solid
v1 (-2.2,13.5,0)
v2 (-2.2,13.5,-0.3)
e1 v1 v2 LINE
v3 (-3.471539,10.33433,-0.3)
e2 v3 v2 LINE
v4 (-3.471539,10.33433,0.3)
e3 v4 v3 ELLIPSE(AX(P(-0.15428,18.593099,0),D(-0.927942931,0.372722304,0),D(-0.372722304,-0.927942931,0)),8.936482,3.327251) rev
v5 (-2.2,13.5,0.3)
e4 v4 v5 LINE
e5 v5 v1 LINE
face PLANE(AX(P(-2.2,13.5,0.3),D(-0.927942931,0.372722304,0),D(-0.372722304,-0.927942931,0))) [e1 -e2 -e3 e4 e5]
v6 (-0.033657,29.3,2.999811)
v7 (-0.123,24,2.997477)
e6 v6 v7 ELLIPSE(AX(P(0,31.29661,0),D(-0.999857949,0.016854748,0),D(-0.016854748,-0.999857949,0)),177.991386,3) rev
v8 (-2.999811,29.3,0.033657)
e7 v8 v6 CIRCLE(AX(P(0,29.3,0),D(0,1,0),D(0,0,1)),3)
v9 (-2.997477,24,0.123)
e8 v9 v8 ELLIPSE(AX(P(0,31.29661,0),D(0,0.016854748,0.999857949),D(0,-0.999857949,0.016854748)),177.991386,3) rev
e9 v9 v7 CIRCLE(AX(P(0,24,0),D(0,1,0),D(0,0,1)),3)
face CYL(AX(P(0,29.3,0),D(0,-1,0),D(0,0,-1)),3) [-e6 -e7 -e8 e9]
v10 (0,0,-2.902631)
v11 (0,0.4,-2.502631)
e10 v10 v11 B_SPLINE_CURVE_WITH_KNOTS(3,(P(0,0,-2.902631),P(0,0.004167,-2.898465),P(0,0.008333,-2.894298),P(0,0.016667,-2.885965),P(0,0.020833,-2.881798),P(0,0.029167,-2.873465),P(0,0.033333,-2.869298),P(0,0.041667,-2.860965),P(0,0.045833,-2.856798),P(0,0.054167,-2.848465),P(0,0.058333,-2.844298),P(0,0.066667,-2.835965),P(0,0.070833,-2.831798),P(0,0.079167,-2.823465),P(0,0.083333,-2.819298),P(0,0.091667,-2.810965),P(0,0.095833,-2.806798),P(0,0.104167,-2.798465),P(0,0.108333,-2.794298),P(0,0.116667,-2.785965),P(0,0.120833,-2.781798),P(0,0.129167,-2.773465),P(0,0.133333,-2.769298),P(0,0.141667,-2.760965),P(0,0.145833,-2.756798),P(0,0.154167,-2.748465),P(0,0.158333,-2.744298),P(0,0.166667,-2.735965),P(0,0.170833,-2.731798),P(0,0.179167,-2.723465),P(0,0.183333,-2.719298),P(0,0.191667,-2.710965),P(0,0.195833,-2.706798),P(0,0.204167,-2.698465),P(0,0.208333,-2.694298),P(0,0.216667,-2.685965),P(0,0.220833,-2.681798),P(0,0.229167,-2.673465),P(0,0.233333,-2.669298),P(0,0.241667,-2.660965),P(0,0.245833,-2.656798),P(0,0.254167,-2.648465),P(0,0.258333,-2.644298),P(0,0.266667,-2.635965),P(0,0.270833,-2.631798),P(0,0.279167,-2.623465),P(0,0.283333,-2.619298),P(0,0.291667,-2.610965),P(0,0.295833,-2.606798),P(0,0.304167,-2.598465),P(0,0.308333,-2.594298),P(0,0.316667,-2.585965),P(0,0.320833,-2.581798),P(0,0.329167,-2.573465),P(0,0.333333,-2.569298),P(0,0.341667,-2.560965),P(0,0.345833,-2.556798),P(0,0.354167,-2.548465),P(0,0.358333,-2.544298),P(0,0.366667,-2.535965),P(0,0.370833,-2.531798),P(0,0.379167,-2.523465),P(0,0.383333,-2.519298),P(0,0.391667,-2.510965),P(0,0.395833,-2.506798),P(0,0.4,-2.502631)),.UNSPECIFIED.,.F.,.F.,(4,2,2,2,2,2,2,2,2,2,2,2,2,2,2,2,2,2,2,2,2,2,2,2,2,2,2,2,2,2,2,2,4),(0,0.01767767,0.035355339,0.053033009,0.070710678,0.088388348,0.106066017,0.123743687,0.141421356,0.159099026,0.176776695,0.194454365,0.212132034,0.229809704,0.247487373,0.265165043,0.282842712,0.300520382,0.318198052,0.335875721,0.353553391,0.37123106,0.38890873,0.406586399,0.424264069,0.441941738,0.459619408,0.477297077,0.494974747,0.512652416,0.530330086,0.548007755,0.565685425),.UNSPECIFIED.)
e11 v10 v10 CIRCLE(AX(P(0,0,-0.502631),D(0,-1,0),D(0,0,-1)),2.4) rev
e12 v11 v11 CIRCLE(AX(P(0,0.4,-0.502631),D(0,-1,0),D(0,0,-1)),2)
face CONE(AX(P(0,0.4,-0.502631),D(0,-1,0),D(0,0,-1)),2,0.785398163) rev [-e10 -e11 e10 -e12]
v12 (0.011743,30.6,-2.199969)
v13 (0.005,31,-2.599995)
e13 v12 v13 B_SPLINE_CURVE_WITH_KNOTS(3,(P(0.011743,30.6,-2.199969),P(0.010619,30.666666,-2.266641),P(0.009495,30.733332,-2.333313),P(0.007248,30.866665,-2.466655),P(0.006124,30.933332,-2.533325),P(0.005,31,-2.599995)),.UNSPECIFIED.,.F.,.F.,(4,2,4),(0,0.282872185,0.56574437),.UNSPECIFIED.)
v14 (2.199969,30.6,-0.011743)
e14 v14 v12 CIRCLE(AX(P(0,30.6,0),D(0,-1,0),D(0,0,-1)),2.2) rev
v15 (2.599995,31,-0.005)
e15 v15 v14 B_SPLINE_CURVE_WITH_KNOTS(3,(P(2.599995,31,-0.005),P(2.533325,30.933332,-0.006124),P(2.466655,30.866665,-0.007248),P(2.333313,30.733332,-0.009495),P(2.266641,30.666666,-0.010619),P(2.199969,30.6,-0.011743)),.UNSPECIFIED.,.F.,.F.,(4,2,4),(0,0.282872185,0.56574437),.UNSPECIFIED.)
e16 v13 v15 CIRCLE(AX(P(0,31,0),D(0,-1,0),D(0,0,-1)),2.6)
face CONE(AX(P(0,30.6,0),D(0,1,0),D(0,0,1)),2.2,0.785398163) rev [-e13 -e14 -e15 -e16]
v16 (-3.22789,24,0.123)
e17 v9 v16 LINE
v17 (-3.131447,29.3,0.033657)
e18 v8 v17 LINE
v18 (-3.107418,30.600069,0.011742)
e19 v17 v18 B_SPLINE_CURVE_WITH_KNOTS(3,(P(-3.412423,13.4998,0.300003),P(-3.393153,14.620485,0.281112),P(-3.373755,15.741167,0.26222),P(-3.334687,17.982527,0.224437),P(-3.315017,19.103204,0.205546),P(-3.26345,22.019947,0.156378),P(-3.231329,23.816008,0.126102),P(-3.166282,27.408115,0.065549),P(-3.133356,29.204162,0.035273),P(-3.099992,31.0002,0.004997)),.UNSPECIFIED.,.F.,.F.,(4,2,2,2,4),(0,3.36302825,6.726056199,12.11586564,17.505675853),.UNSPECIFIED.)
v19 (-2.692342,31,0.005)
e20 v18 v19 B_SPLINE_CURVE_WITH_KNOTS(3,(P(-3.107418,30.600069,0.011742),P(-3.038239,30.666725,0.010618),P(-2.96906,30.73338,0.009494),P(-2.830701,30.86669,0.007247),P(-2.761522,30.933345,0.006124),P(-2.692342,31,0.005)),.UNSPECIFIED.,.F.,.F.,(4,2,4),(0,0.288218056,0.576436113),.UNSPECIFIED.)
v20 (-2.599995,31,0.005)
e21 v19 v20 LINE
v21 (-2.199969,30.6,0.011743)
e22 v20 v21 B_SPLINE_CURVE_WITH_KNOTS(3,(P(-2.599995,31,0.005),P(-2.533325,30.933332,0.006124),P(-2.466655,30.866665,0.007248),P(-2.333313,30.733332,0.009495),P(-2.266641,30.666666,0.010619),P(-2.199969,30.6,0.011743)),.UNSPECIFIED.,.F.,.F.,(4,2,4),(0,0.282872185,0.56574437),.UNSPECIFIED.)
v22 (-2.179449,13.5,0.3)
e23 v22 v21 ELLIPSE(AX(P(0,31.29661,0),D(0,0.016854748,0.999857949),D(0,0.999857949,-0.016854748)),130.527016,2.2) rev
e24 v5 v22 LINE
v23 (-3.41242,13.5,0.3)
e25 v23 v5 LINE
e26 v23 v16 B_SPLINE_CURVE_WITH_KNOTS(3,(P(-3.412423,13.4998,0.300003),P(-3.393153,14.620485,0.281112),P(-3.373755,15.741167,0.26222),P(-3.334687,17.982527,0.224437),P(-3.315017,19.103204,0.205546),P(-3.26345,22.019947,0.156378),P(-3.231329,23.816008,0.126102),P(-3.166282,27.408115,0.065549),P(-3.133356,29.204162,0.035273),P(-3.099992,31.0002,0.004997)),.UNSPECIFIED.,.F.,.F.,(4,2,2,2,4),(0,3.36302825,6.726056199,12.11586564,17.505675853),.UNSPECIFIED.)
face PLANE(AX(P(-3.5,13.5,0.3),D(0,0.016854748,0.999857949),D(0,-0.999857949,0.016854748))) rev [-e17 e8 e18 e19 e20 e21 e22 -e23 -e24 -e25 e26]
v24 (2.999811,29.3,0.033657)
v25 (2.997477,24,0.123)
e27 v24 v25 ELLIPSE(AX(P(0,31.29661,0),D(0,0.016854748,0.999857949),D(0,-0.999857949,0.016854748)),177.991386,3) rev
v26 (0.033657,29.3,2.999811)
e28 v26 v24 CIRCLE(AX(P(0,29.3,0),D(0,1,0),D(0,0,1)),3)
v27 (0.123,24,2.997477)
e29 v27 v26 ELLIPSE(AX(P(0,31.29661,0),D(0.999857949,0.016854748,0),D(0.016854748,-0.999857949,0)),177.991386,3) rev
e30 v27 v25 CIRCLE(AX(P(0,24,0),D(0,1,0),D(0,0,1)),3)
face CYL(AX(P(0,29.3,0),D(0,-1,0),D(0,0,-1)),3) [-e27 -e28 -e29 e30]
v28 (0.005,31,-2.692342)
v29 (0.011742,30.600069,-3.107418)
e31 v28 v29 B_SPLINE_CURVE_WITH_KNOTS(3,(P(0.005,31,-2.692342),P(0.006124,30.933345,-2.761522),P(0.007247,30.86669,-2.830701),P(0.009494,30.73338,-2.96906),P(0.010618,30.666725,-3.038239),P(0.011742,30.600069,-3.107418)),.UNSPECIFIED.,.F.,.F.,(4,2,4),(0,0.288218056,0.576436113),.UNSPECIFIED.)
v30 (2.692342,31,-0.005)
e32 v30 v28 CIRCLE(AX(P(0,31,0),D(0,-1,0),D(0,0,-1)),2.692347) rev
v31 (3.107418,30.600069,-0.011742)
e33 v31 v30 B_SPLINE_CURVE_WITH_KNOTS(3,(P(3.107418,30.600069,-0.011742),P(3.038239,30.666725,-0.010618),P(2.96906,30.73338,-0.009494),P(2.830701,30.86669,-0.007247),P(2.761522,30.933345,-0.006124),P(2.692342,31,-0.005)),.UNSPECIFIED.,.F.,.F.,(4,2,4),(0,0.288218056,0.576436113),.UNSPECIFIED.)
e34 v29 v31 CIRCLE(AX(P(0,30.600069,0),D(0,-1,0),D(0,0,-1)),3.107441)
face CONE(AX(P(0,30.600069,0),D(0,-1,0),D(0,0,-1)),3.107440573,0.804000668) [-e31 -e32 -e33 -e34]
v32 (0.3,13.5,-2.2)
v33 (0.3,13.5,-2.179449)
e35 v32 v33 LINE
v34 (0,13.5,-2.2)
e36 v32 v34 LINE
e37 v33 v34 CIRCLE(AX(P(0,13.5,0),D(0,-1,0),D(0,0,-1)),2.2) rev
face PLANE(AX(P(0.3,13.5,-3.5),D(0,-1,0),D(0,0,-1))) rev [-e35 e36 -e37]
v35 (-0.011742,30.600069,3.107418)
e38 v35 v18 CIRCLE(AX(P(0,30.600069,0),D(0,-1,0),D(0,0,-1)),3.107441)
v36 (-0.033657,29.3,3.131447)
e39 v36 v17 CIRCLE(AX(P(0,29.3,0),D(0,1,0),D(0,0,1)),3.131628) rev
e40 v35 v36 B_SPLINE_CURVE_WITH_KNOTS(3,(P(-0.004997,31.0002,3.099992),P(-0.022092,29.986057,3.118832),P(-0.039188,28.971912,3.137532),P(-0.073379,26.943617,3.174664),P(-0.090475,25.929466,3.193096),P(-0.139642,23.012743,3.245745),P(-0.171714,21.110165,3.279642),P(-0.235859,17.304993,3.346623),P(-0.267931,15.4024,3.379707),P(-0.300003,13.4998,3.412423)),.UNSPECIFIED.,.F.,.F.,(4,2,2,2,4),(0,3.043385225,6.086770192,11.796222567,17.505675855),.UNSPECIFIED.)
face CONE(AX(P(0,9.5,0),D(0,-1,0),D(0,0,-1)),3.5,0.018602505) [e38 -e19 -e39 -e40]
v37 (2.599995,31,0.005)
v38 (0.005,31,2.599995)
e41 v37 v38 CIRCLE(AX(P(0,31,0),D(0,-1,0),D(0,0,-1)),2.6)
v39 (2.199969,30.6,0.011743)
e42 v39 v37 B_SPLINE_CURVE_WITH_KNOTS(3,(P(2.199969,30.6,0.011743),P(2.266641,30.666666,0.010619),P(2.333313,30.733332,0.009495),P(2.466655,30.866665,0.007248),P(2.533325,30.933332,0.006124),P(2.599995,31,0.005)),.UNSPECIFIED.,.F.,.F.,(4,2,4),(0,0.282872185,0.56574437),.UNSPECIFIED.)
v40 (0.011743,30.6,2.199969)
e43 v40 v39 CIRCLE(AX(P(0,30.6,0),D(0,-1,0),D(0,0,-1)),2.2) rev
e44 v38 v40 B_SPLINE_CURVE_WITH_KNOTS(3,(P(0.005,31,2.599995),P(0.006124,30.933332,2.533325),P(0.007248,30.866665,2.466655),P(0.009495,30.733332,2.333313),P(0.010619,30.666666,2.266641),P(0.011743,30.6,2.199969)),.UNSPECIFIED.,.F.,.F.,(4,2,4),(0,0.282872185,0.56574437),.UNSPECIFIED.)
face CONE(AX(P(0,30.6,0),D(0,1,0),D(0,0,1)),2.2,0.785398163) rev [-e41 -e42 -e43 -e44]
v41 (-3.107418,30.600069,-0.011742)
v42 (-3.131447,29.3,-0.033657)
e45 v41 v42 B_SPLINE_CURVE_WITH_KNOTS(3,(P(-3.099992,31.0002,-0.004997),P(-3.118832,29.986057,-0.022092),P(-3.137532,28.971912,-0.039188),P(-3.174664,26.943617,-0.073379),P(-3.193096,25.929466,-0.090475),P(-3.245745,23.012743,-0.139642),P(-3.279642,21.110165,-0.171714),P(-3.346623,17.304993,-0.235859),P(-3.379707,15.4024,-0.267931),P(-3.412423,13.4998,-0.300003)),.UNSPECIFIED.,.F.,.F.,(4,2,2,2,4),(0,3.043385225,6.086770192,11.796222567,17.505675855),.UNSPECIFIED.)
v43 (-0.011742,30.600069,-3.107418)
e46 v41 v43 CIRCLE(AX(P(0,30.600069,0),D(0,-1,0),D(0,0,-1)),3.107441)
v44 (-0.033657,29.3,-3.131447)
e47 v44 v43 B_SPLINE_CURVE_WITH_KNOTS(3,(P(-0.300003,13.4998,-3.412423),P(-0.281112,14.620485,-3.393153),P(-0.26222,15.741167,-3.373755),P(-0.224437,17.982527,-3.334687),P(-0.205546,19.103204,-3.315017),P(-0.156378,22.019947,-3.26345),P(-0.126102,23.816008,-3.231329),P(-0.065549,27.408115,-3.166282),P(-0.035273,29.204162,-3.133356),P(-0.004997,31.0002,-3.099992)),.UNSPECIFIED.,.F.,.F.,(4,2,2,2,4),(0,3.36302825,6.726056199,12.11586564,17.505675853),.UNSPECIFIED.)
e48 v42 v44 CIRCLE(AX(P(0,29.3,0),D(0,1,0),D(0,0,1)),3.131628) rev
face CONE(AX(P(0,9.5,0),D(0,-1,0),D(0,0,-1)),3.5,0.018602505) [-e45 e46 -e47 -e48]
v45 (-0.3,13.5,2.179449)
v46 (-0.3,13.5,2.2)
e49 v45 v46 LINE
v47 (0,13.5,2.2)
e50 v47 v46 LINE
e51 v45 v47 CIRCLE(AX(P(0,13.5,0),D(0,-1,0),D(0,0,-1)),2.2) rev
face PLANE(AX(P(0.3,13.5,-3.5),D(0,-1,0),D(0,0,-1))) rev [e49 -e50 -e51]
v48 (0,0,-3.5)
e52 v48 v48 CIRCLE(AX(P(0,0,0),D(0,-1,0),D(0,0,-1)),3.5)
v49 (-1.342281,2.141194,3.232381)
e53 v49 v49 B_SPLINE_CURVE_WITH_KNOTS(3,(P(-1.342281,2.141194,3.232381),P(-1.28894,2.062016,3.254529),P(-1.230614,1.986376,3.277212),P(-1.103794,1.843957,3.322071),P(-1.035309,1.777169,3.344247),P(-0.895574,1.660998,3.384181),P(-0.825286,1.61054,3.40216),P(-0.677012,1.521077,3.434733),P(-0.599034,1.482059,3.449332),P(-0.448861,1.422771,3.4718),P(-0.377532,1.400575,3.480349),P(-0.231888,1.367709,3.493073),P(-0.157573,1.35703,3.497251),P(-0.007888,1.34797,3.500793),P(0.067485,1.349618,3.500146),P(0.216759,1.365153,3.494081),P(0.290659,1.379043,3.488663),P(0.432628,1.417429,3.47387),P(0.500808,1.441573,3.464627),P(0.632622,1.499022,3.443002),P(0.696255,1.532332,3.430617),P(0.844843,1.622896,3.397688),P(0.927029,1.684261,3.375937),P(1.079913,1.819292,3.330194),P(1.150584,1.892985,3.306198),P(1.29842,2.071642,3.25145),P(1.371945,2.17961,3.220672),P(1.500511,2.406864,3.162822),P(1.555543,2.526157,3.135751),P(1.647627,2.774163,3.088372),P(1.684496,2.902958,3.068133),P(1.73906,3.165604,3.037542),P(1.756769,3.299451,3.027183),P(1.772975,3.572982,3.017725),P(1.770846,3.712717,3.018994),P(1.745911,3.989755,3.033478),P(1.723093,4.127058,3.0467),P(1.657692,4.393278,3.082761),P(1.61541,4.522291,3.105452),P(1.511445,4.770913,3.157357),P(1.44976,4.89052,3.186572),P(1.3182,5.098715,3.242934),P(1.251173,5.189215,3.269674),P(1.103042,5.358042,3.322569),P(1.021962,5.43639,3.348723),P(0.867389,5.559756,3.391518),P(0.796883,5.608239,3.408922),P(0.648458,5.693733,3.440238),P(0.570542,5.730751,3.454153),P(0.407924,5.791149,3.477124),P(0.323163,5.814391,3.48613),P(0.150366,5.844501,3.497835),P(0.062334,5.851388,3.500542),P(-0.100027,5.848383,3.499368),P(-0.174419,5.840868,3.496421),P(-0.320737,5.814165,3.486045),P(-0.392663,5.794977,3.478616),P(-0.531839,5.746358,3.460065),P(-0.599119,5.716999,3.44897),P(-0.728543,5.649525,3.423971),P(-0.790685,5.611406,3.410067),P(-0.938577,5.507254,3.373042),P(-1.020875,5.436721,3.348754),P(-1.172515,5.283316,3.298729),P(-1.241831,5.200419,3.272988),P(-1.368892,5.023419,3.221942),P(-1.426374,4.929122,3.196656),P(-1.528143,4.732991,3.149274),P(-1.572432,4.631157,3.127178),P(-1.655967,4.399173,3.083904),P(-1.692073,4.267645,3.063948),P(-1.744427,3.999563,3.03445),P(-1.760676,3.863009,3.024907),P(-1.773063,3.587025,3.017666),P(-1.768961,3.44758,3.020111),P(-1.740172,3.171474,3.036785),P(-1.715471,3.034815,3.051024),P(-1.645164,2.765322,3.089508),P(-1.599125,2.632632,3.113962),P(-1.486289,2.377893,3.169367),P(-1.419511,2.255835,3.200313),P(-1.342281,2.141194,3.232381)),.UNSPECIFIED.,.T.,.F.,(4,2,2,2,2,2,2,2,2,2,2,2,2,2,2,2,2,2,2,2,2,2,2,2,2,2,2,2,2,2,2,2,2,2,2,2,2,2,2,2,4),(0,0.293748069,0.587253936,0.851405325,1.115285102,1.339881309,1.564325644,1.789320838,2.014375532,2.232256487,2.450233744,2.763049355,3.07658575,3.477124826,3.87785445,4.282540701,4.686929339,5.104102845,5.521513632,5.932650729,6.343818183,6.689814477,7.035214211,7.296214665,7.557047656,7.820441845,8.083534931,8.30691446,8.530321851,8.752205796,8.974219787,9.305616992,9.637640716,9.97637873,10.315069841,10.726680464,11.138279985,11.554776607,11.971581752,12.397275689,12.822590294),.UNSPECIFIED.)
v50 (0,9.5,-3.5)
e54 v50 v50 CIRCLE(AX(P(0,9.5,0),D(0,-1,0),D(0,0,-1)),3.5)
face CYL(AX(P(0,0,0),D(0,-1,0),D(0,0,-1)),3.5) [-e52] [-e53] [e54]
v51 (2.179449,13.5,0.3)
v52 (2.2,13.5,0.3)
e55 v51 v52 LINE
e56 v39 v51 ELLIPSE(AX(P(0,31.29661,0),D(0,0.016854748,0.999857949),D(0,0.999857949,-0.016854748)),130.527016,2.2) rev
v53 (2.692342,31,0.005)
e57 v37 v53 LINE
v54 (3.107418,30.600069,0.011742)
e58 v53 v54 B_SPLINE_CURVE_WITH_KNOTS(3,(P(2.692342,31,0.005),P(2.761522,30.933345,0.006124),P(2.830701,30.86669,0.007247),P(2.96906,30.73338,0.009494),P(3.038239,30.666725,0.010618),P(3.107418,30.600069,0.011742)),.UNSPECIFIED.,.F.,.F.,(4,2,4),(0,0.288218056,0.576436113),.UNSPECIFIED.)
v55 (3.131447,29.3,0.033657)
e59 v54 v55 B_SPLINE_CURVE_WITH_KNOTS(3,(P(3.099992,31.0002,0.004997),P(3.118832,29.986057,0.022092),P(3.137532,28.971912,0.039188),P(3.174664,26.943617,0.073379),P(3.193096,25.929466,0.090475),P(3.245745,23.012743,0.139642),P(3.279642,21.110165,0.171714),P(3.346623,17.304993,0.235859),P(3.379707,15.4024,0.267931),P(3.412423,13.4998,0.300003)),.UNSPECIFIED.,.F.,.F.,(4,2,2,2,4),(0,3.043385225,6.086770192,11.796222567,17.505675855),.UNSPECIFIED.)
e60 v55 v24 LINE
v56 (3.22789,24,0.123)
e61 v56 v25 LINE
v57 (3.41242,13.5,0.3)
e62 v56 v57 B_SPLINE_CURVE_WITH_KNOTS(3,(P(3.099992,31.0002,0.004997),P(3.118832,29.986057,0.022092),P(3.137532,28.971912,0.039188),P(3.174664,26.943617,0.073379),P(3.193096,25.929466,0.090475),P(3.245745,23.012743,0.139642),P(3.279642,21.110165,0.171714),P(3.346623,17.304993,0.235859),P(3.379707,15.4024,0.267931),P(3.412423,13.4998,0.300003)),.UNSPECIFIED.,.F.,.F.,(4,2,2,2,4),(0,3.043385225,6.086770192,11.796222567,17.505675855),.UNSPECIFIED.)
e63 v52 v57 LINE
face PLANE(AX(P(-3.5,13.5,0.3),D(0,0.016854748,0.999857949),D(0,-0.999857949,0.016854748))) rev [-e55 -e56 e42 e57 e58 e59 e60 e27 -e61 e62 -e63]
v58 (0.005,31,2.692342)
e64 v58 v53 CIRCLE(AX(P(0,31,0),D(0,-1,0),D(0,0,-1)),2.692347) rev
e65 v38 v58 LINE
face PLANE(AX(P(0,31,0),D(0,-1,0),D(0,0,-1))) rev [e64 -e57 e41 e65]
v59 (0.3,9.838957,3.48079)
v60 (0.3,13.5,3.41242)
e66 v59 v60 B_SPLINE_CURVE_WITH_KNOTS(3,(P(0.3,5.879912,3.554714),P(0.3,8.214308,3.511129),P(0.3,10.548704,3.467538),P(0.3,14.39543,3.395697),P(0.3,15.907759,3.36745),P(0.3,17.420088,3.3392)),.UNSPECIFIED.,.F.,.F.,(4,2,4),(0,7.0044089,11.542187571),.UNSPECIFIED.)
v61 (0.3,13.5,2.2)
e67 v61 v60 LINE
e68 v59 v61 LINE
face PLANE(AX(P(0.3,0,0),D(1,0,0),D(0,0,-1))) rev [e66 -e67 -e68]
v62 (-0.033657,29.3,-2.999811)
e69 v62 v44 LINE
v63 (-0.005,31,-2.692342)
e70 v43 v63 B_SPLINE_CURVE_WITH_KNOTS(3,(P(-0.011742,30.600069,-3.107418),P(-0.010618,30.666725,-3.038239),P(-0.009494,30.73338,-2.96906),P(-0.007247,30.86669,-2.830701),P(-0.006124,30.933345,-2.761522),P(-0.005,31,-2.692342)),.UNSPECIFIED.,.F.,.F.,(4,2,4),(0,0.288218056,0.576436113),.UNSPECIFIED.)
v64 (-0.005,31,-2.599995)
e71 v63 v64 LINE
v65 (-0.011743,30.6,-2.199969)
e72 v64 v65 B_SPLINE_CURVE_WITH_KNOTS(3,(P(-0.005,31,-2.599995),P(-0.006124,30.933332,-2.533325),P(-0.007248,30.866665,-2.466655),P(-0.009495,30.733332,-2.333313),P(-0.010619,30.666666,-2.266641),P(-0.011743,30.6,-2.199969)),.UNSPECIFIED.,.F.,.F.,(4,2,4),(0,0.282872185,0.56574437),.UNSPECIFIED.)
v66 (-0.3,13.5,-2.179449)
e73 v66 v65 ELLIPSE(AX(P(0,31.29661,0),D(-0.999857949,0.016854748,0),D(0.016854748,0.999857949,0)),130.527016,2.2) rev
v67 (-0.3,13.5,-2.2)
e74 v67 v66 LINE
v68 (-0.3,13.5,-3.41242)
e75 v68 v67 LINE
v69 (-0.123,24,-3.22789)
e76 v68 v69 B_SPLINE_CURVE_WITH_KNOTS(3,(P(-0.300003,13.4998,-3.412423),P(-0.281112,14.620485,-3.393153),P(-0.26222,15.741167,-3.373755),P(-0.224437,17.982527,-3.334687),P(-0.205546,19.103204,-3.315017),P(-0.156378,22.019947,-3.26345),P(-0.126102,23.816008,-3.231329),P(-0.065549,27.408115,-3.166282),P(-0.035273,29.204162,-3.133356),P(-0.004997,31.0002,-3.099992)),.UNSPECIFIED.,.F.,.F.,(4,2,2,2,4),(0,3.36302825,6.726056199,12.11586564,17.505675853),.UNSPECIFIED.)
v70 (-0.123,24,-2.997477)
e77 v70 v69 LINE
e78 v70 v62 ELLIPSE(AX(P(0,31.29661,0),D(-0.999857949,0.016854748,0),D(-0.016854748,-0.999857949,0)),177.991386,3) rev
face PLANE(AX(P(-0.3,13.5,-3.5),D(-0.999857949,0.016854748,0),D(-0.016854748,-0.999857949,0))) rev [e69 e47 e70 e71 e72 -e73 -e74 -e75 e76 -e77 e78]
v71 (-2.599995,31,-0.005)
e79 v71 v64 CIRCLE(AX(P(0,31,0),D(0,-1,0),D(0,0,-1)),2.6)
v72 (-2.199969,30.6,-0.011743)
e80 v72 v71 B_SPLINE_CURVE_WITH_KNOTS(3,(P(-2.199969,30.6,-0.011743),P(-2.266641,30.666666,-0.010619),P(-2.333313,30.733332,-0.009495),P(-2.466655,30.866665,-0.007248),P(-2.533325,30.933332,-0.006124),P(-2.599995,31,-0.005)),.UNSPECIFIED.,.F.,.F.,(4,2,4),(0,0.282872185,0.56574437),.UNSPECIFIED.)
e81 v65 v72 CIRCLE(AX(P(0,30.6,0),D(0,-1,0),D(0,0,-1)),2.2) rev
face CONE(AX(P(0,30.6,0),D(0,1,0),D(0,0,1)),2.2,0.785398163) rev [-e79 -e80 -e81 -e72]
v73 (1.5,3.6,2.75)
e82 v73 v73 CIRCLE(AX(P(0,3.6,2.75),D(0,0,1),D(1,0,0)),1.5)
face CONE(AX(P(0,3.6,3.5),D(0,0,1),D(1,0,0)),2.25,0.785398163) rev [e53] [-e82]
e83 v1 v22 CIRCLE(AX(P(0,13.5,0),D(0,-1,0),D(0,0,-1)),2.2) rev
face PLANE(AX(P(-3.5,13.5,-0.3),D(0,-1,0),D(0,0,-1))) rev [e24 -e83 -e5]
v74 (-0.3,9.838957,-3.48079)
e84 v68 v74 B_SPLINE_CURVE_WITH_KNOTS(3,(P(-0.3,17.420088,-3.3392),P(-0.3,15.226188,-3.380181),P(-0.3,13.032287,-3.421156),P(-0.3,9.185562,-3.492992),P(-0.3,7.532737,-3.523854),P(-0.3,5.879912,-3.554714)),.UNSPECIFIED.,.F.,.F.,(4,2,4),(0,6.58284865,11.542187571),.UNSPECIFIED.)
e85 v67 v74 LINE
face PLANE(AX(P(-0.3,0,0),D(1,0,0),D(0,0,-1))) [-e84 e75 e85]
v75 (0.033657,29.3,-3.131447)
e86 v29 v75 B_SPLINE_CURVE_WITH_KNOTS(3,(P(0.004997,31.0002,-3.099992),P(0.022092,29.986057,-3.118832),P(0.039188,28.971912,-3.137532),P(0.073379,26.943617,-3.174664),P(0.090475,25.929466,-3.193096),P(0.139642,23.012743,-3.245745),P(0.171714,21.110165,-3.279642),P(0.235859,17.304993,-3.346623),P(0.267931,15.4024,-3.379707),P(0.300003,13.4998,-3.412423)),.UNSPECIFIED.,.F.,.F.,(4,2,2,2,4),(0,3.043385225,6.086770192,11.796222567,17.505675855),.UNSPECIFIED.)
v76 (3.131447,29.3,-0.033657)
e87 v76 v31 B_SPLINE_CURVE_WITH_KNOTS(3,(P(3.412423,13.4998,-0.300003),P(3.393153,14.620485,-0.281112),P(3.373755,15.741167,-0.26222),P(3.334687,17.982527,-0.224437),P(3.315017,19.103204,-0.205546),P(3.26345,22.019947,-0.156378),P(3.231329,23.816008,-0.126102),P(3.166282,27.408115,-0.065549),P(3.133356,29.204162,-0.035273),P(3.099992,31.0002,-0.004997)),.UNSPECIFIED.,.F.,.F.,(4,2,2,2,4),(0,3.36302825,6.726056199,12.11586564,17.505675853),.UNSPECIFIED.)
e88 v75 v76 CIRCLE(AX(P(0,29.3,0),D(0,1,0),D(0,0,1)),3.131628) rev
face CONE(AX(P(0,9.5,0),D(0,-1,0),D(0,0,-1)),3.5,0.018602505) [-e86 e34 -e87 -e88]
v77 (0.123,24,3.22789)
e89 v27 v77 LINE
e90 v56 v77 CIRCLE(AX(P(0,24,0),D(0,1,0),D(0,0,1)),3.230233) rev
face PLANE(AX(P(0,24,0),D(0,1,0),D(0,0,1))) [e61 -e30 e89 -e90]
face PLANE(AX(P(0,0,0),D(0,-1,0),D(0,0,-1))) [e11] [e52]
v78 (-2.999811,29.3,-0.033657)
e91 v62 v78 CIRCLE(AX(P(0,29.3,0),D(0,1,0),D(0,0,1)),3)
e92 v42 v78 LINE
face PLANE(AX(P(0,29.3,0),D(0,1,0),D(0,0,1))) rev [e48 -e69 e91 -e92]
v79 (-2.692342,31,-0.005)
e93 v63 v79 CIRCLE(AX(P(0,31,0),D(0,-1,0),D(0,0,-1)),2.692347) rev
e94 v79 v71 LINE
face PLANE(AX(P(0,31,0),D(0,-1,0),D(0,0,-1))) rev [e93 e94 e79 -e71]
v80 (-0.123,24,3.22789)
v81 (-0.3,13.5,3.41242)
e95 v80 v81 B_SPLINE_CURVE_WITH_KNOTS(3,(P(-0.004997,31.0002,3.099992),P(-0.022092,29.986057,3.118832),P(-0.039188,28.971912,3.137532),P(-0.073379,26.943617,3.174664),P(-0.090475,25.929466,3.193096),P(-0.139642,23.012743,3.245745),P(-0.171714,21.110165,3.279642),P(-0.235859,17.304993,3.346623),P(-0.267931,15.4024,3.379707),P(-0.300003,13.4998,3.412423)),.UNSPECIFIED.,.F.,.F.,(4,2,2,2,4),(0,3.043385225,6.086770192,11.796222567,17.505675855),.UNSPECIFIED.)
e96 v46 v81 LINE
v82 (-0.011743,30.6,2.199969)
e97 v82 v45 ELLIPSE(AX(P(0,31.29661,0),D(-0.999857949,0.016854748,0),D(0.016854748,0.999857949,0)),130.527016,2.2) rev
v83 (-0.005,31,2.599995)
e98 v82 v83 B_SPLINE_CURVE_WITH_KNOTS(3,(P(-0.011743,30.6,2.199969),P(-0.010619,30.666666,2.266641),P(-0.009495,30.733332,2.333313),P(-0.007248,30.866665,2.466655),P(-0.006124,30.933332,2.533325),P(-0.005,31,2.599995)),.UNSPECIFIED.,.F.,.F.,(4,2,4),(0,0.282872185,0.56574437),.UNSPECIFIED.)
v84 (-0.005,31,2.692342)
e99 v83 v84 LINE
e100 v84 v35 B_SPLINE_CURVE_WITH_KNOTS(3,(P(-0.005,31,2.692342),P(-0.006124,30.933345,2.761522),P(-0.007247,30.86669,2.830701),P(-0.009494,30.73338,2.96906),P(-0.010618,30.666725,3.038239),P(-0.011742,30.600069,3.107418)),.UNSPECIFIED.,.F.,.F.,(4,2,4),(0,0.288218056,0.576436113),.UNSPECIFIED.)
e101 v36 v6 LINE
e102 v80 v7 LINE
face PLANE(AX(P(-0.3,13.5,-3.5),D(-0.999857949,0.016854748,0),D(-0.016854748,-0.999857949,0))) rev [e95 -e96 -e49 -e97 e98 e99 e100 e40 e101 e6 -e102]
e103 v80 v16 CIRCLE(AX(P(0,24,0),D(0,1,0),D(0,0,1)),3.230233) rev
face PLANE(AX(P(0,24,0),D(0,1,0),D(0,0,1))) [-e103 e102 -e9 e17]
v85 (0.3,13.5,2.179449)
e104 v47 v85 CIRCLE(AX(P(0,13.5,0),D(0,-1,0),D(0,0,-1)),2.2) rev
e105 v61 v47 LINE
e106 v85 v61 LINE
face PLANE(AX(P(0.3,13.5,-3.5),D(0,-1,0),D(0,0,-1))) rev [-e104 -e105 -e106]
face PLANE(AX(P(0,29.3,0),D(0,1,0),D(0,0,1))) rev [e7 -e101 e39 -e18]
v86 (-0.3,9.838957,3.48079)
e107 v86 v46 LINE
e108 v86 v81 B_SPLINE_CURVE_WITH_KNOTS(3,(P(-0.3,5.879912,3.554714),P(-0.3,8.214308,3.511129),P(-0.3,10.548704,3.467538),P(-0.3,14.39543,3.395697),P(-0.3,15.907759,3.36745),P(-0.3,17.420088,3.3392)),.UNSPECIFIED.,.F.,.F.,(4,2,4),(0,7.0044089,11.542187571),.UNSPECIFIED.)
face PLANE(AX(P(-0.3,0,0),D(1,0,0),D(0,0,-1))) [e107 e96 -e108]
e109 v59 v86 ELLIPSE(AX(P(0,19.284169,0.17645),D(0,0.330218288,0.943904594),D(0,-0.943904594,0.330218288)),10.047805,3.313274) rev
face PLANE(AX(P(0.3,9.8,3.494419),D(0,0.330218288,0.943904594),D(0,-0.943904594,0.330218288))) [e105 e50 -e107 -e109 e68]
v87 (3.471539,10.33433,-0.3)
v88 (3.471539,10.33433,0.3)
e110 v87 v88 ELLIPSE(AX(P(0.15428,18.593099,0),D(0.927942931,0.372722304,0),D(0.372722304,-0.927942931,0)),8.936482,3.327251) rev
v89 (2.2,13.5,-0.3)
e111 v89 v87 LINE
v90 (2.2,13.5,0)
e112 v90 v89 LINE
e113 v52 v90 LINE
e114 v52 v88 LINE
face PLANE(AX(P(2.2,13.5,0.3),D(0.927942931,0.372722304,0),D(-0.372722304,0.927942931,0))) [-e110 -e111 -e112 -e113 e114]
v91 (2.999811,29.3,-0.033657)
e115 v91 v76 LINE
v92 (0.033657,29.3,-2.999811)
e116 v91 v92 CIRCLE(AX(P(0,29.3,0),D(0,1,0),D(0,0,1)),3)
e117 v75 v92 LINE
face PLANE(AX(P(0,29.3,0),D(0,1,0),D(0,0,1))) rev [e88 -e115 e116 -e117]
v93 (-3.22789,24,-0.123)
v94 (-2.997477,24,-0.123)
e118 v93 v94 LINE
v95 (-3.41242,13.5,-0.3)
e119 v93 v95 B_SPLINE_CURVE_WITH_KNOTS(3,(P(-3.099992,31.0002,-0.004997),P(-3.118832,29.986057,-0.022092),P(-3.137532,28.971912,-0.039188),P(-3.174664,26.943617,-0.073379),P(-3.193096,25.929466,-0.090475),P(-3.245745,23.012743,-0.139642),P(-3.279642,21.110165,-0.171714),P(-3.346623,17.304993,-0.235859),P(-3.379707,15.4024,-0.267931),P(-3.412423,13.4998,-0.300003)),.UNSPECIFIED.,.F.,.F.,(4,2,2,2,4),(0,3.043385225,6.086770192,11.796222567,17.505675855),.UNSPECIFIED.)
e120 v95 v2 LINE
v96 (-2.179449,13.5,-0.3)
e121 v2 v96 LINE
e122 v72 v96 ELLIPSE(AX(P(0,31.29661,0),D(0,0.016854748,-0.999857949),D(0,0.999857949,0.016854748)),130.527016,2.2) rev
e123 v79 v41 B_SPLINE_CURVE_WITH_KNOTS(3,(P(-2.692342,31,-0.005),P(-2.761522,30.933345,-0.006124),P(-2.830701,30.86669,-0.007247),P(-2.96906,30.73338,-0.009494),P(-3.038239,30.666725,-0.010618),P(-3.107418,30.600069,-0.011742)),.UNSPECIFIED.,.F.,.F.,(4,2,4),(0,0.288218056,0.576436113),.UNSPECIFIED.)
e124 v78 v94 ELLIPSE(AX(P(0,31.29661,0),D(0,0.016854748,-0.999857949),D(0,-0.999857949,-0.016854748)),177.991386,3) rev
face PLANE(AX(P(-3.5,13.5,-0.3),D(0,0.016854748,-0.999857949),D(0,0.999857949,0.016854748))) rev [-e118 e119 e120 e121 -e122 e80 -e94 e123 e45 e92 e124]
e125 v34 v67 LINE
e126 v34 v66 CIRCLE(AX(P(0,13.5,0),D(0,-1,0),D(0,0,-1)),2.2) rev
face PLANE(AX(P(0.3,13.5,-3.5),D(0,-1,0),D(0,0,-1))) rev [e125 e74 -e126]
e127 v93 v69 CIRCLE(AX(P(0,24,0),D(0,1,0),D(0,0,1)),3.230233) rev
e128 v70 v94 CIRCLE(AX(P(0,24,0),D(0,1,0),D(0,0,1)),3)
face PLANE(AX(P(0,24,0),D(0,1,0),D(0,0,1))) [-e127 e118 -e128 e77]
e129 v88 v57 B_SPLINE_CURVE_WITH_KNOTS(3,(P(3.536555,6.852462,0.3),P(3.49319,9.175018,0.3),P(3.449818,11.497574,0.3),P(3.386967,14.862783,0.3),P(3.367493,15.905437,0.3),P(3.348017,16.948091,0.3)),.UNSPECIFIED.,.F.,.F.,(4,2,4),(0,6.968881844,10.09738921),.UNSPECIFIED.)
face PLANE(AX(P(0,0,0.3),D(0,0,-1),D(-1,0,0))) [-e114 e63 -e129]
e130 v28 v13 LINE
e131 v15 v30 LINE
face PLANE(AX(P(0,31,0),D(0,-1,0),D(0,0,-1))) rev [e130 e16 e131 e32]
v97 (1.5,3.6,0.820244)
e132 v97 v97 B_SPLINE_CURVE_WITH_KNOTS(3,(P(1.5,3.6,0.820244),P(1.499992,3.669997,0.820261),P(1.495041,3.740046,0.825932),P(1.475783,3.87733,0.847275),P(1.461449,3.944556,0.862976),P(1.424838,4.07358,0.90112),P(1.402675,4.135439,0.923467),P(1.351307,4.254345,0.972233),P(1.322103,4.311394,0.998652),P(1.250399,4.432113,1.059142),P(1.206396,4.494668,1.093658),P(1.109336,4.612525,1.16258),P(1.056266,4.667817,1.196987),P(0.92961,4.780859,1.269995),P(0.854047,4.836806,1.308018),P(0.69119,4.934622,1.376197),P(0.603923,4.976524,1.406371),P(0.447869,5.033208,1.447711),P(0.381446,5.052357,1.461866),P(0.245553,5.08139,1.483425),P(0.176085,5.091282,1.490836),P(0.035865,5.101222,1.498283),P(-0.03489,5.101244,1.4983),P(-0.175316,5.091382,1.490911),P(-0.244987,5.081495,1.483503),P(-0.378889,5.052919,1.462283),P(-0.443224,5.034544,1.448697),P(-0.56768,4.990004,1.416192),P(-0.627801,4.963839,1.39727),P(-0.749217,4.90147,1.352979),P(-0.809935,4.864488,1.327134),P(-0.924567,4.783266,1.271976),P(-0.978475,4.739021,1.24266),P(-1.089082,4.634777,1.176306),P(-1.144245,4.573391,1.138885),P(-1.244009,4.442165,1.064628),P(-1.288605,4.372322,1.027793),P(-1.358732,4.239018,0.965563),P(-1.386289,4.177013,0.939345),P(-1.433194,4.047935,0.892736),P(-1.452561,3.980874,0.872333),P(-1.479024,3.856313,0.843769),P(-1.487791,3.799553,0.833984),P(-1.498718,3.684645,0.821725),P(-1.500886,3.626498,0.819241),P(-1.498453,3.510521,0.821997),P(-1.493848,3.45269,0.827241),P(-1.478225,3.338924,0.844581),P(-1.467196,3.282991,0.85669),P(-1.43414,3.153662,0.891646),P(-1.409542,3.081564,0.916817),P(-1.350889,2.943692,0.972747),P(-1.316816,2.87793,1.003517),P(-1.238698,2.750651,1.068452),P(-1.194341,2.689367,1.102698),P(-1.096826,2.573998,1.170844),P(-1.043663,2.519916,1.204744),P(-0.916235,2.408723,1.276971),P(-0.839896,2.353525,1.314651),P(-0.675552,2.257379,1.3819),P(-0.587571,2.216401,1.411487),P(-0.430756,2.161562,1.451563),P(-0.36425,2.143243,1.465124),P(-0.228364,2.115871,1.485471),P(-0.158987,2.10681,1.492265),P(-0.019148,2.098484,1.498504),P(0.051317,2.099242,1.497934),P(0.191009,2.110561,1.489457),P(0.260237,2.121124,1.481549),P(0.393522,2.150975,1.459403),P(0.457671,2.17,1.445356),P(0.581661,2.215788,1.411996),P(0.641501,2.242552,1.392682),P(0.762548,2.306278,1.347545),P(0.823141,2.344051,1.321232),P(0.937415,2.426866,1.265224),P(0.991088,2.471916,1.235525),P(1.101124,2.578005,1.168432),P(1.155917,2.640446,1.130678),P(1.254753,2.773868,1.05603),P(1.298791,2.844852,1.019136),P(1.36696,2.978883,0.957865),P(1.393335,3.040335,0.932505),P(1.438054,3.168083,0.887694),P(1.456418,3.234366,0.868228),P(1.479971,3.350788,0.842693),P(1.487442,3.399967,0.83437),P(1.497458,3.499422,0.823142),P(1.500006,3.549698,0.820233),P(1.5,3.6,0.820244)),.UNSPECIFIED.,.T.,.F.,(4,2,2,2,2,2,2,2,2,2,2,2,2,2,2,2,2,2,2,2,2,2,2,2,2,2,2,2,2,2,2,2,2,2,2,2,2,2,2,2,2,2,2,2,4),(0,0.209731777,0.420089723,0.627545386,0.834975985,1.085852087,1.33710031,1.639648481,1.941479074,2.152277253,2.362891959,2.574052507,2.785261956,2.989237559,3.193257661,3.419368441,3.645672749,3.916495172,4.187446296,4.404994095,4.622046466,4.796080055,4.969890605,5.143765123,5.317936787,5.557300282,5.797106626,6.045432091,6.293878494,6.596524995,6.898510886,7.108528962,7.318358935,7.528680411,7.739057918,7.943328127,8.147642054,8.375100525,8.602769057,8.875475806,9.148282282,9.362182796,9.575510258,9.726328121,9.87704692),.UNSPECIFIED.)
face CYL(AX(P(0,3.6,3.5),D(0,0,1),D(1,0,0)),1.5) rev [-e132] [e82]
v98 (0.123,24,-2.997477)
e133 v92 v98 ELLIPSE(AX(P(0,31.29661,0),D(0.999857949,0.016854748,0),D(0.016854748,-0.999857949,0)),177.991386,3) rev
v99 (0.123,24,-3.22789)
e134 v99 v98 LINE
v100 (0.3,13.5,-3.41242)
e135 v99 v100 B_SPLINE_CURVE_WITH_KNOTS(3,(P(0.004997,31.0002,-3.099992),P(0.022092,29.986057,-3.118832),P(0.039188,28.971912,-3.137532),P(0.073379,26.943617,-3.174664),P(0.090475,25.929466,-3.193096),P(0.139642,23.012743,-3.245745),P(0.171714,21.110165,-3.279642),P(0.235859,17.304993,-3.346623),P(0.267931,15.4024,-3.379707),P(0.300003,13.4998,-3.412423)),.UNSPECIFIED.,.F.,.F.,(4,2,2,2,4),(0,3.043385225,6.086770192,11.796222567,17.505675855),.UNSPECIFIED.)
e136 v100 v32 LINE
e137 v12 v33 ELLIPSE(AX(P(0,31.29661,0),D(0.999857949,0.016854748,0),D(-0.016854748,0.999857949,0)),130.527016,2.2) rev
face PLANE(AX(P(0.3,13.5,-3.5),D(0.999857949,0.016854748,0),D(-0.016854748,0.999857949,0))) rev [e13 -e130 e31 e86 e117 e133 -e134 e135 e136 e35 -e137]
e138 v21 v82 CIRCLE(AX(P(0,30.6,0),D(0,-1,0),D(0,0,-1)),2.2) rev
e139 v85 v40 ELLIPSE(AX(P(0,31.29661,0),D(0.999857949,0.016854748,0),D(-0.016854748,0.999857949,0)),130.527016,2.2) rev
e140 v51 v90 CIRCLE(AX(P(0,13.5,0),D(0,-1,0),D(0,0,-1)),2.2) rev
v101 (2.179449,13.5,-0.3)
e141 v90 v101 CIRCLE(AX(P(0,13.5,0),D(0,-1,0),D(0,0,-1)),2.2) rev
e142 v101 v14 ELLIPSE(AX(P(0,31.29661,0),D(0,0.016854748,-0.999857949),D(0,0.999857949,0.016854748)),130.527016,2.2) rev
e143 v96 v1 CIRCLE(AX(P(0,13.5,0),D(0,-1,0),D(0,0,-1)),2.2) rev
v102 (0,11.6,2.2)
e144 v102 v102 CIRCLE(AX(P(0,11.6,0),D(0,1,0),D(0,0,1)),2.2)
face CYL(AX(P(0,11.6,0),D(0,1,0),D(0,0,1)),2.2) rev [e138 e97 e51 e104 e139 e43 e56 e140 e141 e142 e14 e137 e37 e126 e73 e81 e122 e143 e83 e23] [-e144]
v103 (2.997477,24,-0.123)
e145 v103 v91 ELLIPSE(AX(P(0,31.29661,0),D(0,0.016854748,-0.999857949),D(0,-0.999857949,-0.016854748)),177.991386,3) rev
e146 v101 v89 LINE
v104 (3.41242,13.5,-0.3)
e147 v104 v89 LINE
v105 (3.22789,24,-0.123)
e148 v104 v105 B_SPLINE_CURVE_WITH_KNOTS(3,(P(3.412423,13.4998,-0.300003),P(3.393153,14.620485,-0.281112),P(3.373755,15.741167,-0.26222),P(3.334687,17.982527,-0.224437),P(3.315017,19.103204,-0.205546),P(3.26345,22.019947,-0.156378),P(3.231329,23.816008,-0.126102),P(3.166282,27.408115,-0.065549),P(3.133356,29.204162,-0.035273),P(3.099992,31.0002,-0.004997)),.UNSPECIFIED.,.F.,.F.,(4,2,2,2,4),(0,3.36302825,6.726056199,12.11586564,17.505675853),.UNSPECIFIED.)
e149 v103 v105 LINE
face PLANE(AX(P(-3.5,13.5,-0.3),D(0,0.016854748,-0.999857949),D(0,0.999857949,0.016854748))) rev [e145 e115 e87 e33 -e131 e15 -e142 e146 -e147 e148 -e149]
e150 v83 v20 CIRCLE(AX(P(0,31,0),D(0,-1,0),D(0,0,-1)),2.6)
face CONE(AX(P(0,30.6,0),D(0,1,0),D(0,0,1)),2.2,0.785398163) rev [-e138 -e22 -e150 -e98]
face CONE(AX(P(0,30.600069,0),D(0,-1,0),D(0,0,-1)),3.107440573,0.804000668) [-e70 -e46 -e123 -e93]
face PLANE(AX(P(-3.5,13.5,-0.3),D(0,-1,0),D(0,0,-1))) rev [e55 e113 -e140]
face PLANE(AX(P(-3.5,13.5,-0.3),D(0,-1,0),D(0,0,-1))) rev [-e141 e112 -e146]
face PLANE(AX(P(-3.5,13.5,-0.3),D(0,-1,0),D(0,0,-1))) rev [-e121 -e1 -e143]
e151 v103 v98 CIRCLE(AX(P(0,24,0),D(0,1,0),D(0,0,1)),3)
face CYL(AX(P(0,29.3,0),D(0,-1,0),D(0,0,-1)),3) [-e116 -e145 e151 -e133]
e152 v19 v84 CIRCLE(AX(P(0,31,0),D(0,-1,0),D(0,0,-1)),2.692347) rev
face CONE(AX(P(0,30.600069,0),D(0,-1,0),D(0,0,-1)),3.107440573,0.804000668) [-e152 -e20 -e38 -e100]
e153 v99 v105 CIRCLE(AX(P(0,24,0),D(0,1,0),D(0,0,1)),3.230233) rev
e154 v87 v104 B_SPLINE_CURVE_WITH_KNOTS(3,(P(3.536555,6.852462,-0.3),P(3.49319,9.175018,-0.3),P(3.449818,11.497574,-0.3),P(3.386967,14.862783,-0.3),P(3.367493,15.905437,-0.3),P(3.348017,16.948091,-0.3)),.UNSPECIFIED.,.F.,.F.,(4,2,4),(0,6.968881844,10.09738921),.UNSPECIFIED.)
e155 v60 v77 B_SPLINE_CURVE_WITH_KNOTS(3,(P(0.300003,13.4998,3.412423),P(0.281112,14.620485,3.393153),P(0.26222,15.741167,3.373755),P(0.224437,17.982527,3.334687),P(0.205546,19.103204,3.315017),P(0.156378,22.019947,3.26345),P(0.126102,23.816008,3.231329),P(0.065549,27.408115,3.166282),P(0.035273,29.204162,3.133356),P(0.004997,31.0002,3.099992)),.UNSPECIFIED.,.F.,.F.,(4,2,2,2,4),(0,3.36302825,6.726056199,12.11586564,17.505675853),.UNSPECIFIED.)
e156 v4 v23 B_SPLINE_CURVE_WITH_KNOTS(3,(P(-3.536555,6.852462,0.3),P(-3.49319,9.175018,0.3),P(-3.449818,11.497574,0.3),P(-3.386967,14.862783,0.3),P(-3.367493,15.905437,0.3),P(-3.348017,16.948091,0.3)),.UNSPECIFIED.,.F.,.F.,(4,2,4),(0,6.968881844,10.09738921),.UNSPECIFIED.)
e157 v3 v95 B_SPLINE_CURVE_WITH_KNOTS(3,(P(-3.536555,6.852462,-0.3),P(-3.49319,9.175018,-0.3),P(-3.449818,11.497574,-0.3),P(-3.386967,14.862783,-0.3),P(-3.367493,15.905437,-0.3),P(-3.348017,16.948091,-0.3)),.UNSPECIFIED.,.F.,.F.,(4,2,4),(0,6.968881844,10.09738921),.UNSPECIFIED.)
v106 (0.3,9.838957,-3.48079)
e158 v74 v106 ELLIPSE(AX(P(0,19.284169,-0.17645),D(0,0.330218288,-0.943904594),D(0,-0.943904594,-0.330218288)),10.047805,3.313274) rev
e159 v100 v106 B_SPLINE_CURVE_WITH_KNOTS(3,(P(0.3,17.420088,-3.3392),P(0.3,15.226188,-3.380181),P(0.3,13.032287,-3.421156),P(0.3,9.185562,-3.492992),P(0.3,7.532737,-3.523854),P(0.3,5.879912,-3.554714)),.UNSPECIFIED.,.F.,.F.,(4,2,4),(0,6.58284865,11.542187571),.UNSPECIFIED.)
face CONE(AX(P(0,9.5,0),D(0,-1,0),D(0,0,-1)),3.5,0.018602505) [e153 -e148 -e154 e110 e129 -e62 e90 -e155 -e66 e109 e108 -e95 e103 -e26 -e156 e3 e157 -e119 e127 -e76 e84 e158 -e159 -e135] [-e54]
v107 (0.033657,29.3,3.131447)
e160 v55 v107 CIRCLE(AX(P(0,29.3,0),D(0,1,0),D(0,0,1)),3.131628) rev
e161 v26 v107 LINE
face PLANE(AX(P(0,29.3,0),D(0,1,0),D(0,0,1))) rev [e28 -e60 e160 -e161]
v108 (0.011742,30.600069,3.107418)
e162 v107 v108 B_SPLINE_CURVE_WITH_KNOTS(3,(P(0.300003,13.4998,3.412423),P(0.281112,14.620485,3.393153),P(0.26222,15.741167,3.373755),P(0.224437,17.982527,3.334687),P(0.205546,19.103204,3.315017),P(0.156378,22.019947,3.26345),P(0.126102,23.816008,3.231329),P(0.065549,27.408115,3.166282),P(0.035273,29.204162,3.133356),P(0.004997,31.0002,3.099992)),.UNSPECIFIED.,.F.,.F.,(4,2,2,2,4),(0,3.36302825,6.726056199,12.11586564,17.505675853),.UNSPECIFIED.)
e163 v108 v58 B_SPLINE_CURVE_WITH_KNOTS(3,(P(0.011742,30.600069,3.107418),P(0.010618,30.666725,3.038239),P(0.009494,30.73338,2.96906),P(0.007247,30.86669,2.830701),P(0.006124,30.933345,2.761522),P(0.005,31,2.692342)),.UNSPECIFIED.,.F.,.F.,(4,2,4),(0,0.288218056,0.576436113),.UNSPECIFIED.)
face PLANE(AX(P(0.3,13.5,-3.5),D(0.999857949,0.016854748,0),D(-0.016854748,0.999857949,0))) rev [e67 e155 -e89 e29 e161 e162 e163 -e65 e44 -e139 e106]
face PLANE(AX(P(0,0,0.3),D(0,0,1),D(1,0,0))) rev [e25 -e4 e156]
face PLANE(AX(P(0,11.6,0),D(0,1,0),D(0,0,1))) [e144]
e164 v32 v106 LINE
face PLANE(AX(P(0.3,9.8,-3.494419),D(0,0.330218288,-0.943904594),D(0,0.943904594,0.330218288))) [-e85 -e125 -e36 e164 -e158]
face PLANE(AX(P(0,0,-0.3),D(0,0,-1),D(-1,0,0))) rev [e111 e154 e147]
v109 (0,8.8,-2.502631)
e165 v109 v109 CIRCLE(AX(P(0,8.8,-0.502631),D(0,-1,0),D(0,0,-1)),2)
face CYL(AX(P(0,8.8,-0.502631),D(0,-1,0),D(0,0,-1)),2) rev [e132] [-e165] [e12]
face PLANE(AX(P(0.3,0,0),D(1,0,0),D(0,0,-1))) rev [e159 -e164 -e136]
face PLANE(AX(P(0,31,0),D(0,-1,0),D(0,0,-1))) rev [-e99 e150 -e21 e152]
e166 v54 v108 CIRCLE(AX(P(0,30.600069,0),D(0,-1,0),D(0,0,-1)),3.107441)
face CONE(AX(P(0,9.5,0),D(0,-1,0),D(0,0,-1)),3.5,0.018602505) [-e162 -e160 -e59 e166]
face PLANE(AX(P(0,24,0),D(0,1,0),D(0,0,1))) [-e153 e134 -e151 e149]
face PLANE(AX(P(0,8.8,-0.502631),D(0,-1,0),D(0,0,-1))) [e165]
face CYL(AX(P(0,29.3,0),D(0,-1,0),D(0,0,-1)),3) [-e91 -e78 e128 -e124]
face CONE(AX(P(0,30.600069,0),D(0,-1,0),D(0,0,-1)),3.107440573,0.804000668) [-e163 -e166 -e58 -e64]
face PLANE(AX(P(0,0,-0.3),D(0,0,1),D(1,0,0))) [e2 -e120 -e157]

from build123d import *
from OCP.BRepFilletAPI import BRepFilletAPI_MakeChamfer

# Parameters (mm, degrees)
SKETCH1_W               = 3.5
SKETCH1_H               = 9.5
SKETCH2_R               = 2.2
CUT_EXTRUDE1_DEPTH      = 19.4
SKETCH3_R               = 2
CUT_EXTRUDE2_DEPTH      = 8.8
CUT_EXTRUDE3_DEPTH      = 32.972644557
CUT_EXTRUDE4_DEPTH      = 32.972644557
CUT_EXTRUDE5_DEPTH      = 0.3
CUT_EXTRUDE5_DEPTH_BACK = 0.3
CUT_EXTRUDE6_DEPTH      = 0.3
CUT_EXTRUDE6_DEPTH_BACK = 0.3
CUT_EXTRUDE7_START      = 5.3
SKETCH15_R              = 3.5
SKETCH15_R_2            = 3
CUT_EXTRUDE7_DEPTH      = 5.3
CHAMFER1_SIZE           = 0.4
CHAMFER1_SIZE2          = 0.407653471


# Read off the part's stored shape, not the designer's step: CSK for M3 Oval Head Machine Screw1
with BuildPart() as part:
    # Sketch1 → Revolve1 (revolve)
    with BuildSketch(Plane.XY, mode=Mode.PRIVATE) as revolve1_sk:
        Polygon((0, 9.5), (3.5, 9.5), (3.1, 31), (0, 31), align=None)
        with Locations((1.75, 4.75)):
            Rectangle(SKETCH1_W, SKETCH1_H)
    revolve(revolve1_sk.sketch.rotate(Axis((0, 0, 0), (0, 1, 0)), 90), axis=Axis((0, 0, 0), (0, 1, 0)))

    # Sketch2 → Cut-Extrude1 (cut)
    with BuildSketch(Plane(origin=(0, 31, 0), x_dir=(1, 0, 0), z_dir=(0, 1, 0))):
        with Locations(Location((0, 0, 0), (0, 0, 270))):
            Circle(SKETCH2_R)
    extrude(amount=-CUT_EXTRUDE1_DEPTH, mode=Mode.SUBTRACT)

    # Sketch3 → Cut-Extrude2 (cut)
    with BuildSketch(Plane.XZ):
        with Locations(Location((0, -0.502631205, 0), (0, 0, 270))):
            Circle(SKETCH3_R)
    extrude(amount=-CUT_EXTRUDE2_DEPTH, mode=Mode.SUBTRACT)

    # Sketch5 → Cut-Extrude3 (cut, through all)
    with BuildSketch(Plane(origin=(3.5, 0, 0), x_dir=(0, 0, -1), z_dir=(1, 0, 0))):
        Polygon((0.3, 13.5), (-0.3, 13.5), (-0.005, 31), (0.005, 31), align=None)
    extrude(amount=-CUT_EXTRUDE3_DEPTH, mode=Mode.SUBTRACT)

    # Sketch9 → Cut-Extrude4 (cut, through all)
    with BuildSketch(Plane.XY.offset(3.5)):
        Polygon((0.3, 13.5), (-0.3, 13.5), (-0.005, 31), (0.005, 31), align=None)
    extrude(amount=-CUT_EXTRUDE4_DEPTH, mode=Mode.SUBTRACT)

    # Sketch11 → Cut-Extrude5 (cut, two sides: drawn at the far end of the back side and taken through both)
    with BuildSketch(Plane.XY.offset(-CUT_EXTRUDE5_DEPTH_BACK)):
        Polygon((-3.485105978, 10.300553669), (-3.425581395, 13.5), (-2.2, 13.5), align=None)
        Polygon((2.2, 13.5), (3.485105978, 10.300553669), (3.425581395, 13.5), align=None)
    extrude(amount=CUT_EXTRUDE5_DEPTH + CUT_EXTRUDE5_DEPTH_BACK, mode=Mode.SUBTRACT)

    # Sketch14 → Cut-Extrude6 (cut, two sides: drawn at the far end of the back side and taken through both)
    with BuildSketch(Plane(origin=(0, 0, 0), x_dir=(0, 0, -1), z_dir=(1, 0, 0)).offset(-CUT_EXTRUDE6_DEPTH_BACK)):
        Polygon((2.2, 13.5), (3.425581395, 13.5), (3.494418605, 9.8), align=None)
        Polygon((-3.425581395, 13.5), (-3.494418605, 9.8), (-2.2, 13.5), align=None)
    extrude(amount=CUT_EXTRUDE6_DEPTH + CUT_EXTRUDE6_DEPTH_BACK, mode=Mode.SUBTRACT)

    # Sketch15 → Cut-Extrude7 (cut)
    with BuildSketch(Plane(origin=(0, 24, 0), x_dir=(1, 0, 0), z_dir=(0, 1, 0)).offset(CUT_EXTRUDE7_START)):
        with Locations(Location((0, 0, 0), (0, 0, 90))):
            Circle(SKETCH15_R)
        Circle(SKETCH15_R_2, mode=Mode.SUBTRACT)
    extrude(amount=-CUT_EXTRUDE7_DEPTH, mode=Mode.SUBTRACT)

    # CSK for M3 Oval Head Machine Screw1 outl → CSK for M3 Oval Head Machine Screw1 (revolve, cut)
    with BuildSketch(Plane.XZ.offset(-3.6)):
        Polygon((0, 0.819848747), (1.5, 0.819848747), (1.5, 2.75), (2.250138013, 3.500138013), (0, 3.500138013), align=None)
    revolve(axis=Axis((0, 3.6, 0), (0, 0, 1)), mode=Mode.SUBTRACT)

    # Chamfer1: one chamfer whose edges measure the first distance from different faces: ONE call of the kernel's chamfer builder (chamfer() names one face for all edges)
    chamfer1_edges_1 = [part.edges().sort_by_distance(p)[0] for p in [
        (-2.192031022, 31, -2.192031022),
    ]]
    chamfer1_side_1 = [part.faces().sort_by_distance(p)[0] for p in [
        (-2.203213175, 30.15, -2.203213175),
    ]]
    chamfer1_edges_2 = [part.edges().sort_by_distance(p)[0] for p in [
        (2.192031022, 31, -2.192031022),
    ]]
    chamfer1_side_2 = [part.faces().sort_by_distance(p)[0] for p in [
        (2.203213175, 30.15, -2.203213175),
    ]]
    chamfer1_edges_3 = [part.edges().sort_by_distance(p)[0] for p in [
        (2.192031022, 31, 2.192031022),
    ]]
    chamfer1_side_3 = [part.faces().sort_by_distance(p)[0] for p in [
        (2.203213175, 30.15, 2.203213175),
    ]]
    chamfer1_edges_4 = [part.edges().sort_by_distance(p)[0] for p in [
        (-2.192031022, 31, 2.192031022),
    ]]
    chamfer1_side_4 = [part.faces().sort_by_distance(p)[0] for p in [
        (-2.203213175, 30.15, 2.203213175),
    ]]
    chamfer1_edges_5 = [part.edges().sort_by_distance(p)[0] for p in [
        (-1.555634919, 31, -1.555634919),
        (1.555634919, 31, -1.555634919),
        (1.555634919, 31, 1.555634919),
        (-1.555634919, 31, 1.555634919),
        (0, 0, 1.497368795),
    ]]
    chamfer1 = BRepFilletAPI_MakeChamfer(part.part.solid().wrapped)
    for e in chamfer1_edges_1:
        chamfer1.Add(CHAMFER1_SIZE, CHAMFER1_SIZE2, e.wrapped, chamfer1_side_1[0].wrapped)  # the first distance lies on this face
    for e in chamfer1_edges_2:
        chamfer1.Add(CHAMFER1_SIZE, CHAMFER1_SIZE2, e.wrapped, chamfer1_side_2[0].wrapped)  # the first distance lies on this face
    for e in chamfer1_edges_3:
        chamfer1.Add(CHAMFER1_SIZE, CHAMFER1_SIZE2, e.wrapped, chamfer1_side_3[0].wrapped)  # the first distance lies on this face
    for e in chamfer1_edges_4:
        chamfer1.Add(CHAMFER1_SIZE, CHAMFER1_SIZE2, e.wrapped, chamfer1_side_4[0].wrapped)  # the first distance lies on this face
    for e in chamfer1_edges_5:
        chamfer1.Add(CHAMFER1_SIZE, e.wrapped)
    add(Compound.cast(chamfer1.Shape()), mode=Mode.REPLACE)


solid = part.part
